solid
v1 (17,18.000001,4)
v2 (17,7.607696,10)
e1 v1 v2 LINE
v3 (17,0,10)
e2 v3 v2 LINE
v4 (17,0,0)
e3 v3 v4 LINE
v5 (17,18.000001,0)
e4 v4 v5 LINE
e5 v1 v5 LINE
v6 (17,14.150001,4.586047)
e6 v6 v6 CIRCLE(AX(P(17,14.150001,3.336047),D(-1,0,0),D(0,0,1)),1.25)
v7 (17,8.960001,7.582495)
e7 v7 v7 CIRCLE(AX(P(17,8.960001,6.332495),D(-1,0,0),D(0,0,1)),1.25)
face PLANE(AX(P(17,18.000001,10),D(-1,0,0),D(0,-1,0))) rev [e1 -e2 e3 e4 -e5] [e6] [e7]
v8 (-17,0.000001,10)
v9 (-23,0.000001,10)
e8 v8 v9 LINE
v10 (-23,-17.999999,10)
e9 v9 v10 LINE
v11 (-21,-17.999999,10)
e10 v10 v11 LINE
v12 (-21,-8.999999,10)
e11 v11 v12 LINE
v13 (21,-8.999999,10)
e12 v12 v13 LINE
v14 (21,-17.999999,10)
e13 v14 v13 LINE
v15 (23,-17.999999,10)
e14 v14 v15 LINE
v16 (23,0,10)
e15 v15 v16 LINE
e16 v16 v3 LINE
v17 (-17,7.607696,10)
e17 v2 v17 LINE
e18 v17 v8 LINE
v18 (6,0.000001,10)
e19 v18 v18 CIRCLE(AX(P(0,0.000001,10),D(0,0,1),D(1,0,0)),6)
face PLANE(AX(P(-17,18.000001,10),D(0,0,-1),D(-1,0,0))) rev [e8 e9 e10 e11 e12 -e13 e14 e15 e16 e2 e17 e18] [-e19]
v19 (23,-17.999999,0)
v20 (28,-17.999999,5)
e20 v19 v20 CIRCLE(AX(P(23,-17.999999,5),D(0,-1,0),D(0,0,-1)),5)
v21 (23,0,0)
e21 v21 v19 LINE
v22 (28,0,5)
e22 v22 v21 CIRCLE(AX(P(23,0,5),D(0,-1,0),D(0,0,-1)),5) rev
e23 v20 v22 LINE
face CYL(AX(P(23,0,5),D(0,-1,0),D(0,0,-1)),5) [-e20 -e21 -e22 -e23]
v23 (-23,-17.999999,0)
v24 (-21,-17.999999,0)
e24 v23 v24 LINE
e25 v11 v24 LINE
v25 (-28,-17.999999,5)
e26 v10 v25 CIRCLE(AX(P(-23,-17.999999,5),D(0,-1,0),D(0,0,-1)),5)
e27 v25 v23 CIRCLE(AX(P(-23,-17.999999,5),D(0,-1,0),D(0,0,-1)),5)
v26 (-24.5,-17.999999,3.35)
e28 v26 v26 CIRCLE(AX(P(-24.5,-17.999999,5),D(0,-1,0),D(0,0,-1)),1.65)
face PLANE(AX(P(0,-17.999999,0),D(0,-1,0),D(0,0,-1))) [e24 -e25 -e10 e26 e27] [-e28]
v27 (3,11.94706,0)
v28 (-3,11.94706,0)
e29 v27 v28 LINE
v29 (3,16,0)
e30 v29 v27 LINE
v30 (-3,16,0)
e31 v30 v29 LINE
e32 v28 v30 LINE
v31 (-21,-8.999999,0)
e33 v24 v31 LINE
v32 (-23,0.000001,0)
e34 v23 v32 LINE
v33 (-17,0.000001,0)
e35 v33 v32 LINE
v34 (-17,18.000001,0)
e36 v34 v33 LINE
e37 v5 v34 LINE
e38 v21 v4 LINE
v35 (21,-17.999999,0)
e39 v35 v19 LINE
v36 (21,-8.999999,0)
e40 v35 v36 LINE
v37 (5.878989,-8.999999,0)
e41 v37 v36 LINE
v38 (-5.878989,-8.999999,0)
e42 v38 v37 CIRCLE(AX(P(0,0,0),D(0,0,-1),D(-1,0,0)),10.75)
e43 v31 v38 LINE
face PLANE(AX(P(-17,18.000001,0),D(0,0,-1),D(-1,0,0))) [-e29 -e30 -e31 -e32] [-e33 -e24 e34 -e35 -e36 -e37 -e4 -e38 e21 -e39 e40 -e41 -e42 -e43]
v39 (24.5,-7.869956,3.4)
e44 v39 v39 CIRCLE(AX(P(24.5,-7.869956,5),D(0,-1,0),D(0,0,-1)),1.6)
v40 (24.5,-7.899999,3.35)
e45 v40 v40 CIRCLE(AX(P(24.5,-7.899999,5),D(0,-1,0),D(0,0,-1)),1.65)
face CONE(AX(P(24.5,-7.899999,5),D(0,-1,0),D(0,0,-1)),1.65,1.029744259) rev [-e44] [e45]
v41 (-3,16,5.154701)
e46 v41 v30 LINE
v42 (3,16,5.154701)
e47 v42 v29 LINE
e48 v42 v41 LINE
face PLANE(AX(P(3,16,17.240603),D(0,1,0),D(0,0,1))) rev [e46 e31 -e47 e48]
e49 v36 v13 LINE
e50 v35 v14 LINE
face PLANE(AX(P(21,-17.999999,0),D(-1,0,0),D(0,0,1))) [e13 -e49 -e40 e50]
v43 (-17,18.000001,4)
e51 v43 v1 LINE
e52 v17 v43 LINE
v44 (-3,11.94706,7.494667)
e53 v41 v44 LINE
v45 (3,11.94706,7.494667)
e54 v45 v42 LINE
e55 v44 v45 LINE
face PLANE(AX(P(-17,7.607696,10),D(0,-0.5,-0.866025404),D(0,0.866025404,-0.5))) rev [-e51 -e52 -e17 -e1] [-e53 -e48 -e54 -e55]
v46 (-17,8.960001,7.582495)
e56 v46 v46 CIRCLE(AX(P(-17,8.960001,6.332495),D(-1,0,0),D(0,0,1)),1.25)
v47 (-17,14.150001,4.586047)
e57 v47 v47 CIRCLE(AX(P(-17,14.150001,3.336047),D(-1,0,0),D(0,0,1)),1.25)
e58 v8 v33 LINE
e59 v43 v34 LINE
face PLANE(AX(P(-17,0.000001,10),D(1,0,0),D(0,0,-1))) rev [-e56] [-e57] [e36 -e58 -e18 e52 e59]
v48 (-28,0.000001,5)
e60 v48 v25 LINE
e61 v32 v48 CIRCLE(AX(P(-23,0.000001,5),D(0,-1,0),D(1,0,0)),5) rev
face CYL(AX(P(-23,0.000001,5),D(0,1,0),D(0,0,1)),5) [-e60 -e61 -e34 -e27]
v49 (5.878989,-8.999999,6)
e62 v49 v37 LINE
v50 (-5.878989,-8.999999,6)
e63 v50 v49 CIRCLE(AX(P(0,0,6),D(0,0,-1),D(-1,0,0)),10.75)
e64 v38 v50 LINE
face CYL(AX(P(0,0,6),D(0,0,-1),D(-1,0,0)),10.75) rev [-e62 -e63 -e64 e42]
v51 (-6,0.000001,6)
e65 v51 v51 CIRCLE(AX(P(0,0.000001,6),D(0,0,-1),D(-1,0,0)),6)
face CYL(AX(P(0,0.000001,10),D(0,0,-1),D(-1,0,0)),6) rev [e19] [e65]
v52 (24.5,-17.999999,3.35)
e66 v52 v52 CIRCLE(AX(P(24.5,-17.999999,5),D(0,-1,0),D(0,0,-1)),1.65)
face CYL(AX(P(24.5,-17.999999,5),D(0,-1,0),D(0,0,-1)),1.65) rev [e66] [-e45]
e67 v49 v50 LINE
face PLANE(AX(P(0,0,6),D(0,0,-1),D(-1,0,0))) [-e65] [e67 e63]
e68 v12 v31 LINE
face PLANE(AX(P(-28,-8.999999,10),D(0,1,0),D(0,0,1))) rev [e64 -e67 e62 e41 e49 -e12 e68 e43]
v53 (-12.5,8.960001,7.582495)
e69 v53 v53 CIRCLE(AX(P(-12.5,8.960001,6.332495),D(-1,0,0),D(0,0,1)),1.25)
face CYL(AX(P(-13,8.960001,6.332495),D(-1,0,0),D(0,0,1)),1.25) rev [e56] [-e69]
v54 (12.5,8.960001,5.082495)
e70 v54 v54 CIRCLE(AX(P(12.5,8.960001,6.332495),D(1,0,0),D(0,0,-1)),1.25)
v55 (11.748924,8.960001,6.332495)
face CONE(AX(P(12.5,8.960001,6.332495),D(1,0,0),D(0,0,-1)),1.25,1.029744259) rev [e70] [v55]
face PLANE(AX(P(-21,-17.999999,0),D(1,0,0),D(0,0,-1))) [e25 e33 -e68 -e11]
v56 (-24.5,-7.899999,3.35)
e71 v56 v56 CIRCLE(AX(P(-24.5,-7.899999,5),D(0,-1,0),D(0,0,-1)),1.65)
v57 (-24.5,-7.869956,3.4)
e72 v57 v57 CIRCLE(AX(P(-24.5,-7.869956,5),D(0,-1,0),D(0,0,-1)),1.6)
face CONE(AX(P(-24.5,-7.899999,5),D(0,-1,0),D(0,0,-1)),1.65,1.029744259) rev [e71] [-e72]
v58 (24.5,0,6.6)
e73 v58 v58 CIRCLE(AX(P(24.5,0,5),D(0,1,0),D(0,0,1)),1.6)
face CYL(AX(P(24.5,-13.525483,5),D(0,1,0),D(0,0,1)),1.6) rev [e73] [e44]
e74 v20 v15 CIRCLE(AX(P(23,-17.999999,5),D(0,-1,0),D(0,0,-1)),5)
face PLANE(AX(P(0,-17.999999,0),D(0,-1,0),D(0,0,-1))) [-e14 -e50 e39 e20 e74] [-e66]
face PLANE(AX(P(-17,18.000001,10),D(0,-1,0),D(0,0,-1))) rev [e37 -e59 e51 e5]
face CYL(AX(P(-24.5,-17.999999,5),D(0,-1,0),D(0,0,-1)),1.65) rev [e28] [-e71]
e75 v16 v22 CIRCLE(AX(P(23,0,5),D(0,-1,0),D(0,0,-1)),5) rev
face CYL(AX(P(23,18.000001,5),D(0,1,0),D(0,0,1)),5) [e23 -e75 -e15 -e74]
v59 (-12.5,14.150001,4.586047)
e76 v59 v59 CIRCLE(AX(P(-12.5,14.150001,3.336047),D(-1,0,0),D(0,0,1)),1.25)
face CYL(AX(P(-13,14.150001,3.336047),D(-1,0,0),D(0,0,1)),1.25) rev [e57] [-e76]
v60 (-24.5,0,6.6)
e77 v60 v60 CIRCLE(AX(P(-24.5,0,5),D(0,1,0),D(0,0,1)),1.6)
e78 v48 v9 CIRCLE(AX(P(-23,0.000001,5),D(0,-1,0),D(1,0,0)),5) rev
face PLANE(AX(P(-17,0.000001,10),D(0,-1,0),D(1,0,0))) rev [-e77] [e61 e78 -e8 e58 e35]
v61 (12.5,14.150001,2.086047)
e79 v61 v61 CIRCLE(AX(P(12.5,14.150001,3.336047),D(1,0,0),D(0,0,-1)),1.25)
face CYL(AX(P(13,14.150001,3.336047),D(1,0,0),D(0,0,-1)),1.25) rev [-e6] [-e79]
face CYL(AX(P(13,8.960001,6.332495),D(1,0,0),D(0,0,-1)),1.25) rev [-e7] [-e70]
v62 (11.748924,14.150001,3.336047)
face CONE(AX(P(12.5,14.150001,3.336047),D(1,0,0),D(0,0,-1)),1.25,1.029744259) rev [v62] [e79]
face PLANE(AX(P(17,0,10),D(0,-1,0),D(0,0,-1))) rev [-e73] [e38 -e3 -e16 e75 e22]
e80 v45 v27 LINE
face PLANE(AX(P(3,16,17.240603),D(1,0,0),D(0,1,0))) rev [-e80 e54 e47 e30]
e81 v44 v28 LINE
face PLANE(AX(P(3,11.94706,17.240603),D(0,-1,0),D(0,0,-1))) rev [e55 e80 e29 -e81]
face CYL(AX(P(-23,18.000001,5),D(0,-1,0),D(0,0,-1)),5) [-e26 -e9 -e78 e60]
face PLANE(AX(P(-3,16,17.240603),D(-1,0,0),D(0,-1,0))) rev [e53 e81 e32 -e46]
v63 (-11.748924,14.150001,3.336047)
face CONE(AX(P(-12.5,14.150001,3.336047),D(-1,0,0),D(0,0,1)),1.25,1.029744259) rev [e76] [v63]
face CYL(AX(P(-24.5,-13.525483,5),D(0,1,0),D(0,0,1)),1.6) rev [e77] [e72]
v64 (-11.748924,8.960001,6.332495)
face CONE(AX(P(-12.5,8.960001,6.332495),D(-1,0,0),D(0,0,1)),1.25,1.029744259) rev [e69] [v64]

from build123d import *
from OCP.BRepAlgoAPI import BRepAlgoAPI_Cut
from OCP.TopTools import TopTools_ListOfShape
from build123d.topology import SkipClean

# Parameters (mm, degrees)
SKETCH1_R                   = 6
EXTRUDE1_DEPTH              = 10
SKETCH2_R                   = 10.75
CUT_EXTRUDE1_DEPTH          = 6
SKETCH3_R                   = 1.6
CUT_EXTRUDE2_DEPTH          = 8.999999347
SKETCH4_W                   = 7
SKETCH4_H                   = 10
SKETCH4_R                   = 1.6
EXTRUDE3_DEPTH              = 9
FILLET2_R                   = 5
CHAMFER4_SIZE               = 6
CHAMFER4_SIZE2              = 10.392304845
M4_TAPPED_HOLE1_D           = 3.3
M4_TAPPED_HOLE1_DEPTH       = 10.1
M4_TAPPED_HOLE1_TIP         = 0.991420021
SKETCH6_R                   = 1.25
EXTRUDE4_DEPTH              = 4
M3_START                    = 12.4999999
M3_TAPPED_HOLE1_OUTLINE_R   = 1.25
M3_TAPPED_HOLE1_DEPTH       = 0.5000001
M3_START_2                  = -13
M3_TAPPED_HOLE1_2_OUTLINE_R = 1.25
M3_TAPPED_HOLE1_2_DEPTH     = 0.4999999
EXTRUDE5_REACH              = 36.756
SKETCH8_W                   = 6
SKETCH8_H                   = 4.052940251


with BuildPart() as part:
    # Sketch1 → Extrude1 (new body)
    with BuildSketch(Plane.XY):
        Polygon((-17, 6.53e-07), (-28, 6.53e-07), (-28, -8.999999347), (28, -8.999999347), (28, 0), (17, 0), (17, 18.000000653), (-17, 18.000000653), align=None)
        with Locations((0, 6.53e-07)):
            Circle(SKETCH1_R, mode=Mode.SUBTRACT)
    extrude(amount=EXTRUDE1_DEPTH)

    # Sketch2 → Cut-Extrude1 (cut)
    with BuildSketch(Plane(origin=(0, 0, 0), x_dir=(-1, 0, 0), z_dir=(0, 0, -1))):
        Circle(SKETCH2_R)
    extrude(amount=-CUT_EXTRUDE1_DEPTH, mode=Mode.SUBTRACT)


with BuildPart() as cut_extrude2_tool:
    # Sketch3 → Cut-Extrude2 (new body)
    with BuildSketch(Plane(origin=(0, 0, 0), x_dir=(-1, 0, 0), z_dir=(0, 1, 0))):
        with Locations(Location((-24.5, 5, 0), (0, 0, 90))):
            Circle(SKETCH3_R)
        with Locations(Location((24.5, 5, 0), (0, 0, 90))):
            Circle(SKETCH3_R)
    extrude(amount=-CUT_EXTRUDE2_DEPTH)


with BuildPart() as part_1:
    add(part.part)

    # Cut-Extrude2: cut by cut_extrude2_tool, with a tolerance
    cut_extrude2_stock = TopTools_ListOfShape()
    cut_extrude2_stock.Append(part_1.part.wrapped)
    cut_extrude2_tools = TopTools_ListOfShape()
    cut_extrude2_tools.Append(cut_extrude2_tool.part.wrapped)
    cut_extrude2_cut = BRepAlgoAPI_Cut()
    cut_extrude2_cut.SetArguments(cut_extrude2_stock)
    cut_extrude2_cut.SetTools(cut_extrude2_tools)
    cut_extrude2_cut.SetFuzzyValue(0.00001)
    cut_extrude2_cut.Build()
    add(Compound.cast(cut_extrude2_cut.Shape()).solids(), mode=Mode.REPLACE)

    # Sketch4 → Extrude3 (add)
    # profile 1 of 2: a face of its own
    with SkipClean():  # the faces are left unmerged after this step: merging them gives an invalid solid
        with BuildSketch(Plane.XZ.offset(8.999999347)):
            with Locations((-24.5, 5)):
                Rectangle(SKETCH4_W, SKETCH4_H)
            with Locations((-24.5, 5)):
                Circle(SKETCH4_R, mode=Mode.SUBTRACT)
        # profile 2 of 2: a face of its own
        with BuildSketch(Plane.XZ.offset(8.999999347)):
            with Locations((24.5, 5)):
                Rectangle(SKETCH4_W, SKETCH4_H)
            with Locations((24.5, 5)):
                Circle(SKETCH4_R, mode=Mode.SUBTRACT)
        extrude(amount=EXTRUDE3_DEPTH)
    add(part_1.part.scale(1), mode=Mode.REPLACE)  # the faces are merged on a copy

    # Fillet2
    fillet2_edges = [part_1.edges().sort_by_distance(p)[0] for p in [
        (28, -13.499999347, 0),
        (28, -13.499999347, 10),
        (-28, -8.999999347, 0),
        (-28, -8.999999347, 10),
    ]]
    fillet(fillet2_edges, radius=FILLET2_R - 0.0001)  # a hair under: the kernel refuses the full size

    # Chamfer4
    chamfer4_edges = [part_1.edges().sort_by_distance(p)[0] for p in [
        (0, 18.000000653, 10),
    ]]
    chamfer4_side = [part_1.faces().sort_by_distance(p)[0] for p in [
        (0, 18.000000653, 5),
    ]]
    chamfer(chamfer4_edges, length=CHAMFER4_SIZE, length2=CHAMFER4_SIZE2, reference=chamfer4_side[0])

    # M4 Tapped Hole1
    with Locations(Plane(origin=(-24.5, -17.999999347, 5), x_dir=(0, 0, -1), z_dir=(0, -1, 0))):
        with Locations((0, 0), (0, 49)):
            Hole(M4_TAPPED_HOLE1_D / 2, depth=M4_TAPPED_HOLE1_DEPTH)
            with Locations((0, 0, -(M4_TAPPED_HOLE1_DEPTH + M4_TAPPED_HOLE1_TIP / 2))):  # 118° drill point
                Cone(0, M4_TAPPED_HOLE1_D / 2, M4_TAPPED_HOLE1_TIP, mode=Mode.SUBTRACT)

    # Sketch6 → Extrude4 (cut)
    with BuildSketch(Plane.ZY.offset(17)):
        with Locations((3.33604719, 14.150000653)):
            Circle(SKETCH6_R)
        with Locations((6.332495088, 8.960000653)):
            Circle(SKETCH6_R)
    extrude4 = extrude(amount=-EXTRUDE4_DEPTH, mode=Mode.SUBTRACT)

    # Mirror1: Extrude4 across plane
    add(extrude4.mirror(Plane(origin=(0, 0, 0), x_dir=(0, 0, 1), z_dir=(1, 0, 0))), mode=Mode.SUBTRACT)

    # M3 Tapped Hole1: read off the stored shape, not the designer's step
    # M3 Tapped Hole1 outline → M3 Tapped Hole1 (cut)
    with SkipClean():  # the faces are left unmerged after this step: merging them gives an invalid solid
        with BuildSketch(Plane.YZ.offset(M3_START)):
            with Locations((14.150000653, 3.33604719)):
                Circle(M3_TAPPED_HOLE1_OUTLINE_R)
            with Locations((8.960000653, 6.332495088)):
                Circle(M3_TAPPED_HOLE1_OUTLINE_R)
        extrude(amount=M3_TAPPED_HOLE1_DEPTH, mode=Mode.SUBTRACT)

    # M3 Tapped Hole1 2 outline → M3 Tapped Hole1 2 (cut)
    with BuildSketch(Plane.YZ.offset(M3_START_2)):
        with Locations((14.150000653, 3.33604719)):
            Circle(M3_TAPPED_HOLE1_2_OUTLINE_R)
        with Locations((8.960000653, 6.332495088)):
            Circle(M3_TAPPED_HOLE1_2_OUTLINE_R)
    extrude(amount=M3_TAPPED_HOLE1_2_DEPTH, mode=Mode.SUBTRACT)

    # M3 Tapped Hole1 3 outline → M3 Tapped Hole1 3 (revolve, cut)
    with BuildSketch(Plane(origin=(0, 14.150000653, 3.33604719), x_dir=(0, 1, 0), z_dir=(0, 0, -1))):
        Polygon((0, 12.5), (0, 11.748924226), (1.25, 12.5), align=None)
        Polygon((1.25, -12.5), (0, -11.748924226), (0, -12.5000001), align=None)
    revolve(axis=Axis((0, 14.150000653, 3.33604719), (1, 0, 0)), mode=Mode.SUBTRACT)

    # M3 Tapped Hole1 4 outline → M3 Tapped Hole1 4 (revolve, cut)
    with BuildSketch(Plane(origin=(0, 8.960000653, 6.332495088), x_dir=(0, 1, 0), z_dir=(0, 0, -1))):
        Polygon((0, 12.5), (0, 11.748924226), (1.25, 12.5), align=None)
        Polygon((1.25, -12.5), (0, -11.748924226), (0, -12.5000001), align=None)
    revolve(axis=Axis((0, 8.960000653, 6.332495088), (1, 0, 0)), mode=Mode.SUBTRACT)

    # Extrude5: up to this plane
    extrude5_end = Plane(origin=(-17, 7.607695808, 10), z_dir=(0, -0.5000000000000007, -0.8660254037844384))
    # Sketch8 → Extrude5 (cut, up to the surface)
    with BuildSketch(Plane(origin=(0, 0, 0), x_dir=(-1, 0, 0), z_dir=(0, 0, -1)), mode=Mode.PRIVATE) as extrude5_sk1:
        with Locations((0, 13.973529875)):
            Rectangle(SKETCH8_W, SKETCH8_H)
    extrude5_tool1 = split(extrude(extrude5_sk1.sketch, amount=-EXTRUDE5_REACH, mode=Mode.PRIVATE), bisect_by=extrude5_end, keep=Keep.BOTH, mode=Mode.PRIVATE)
    add(extrude5_tool1.solids().sort_by_distance((0, 13.97353, 0))[0], mode=Mode.SUBTRACT)


solid = part_1.part
